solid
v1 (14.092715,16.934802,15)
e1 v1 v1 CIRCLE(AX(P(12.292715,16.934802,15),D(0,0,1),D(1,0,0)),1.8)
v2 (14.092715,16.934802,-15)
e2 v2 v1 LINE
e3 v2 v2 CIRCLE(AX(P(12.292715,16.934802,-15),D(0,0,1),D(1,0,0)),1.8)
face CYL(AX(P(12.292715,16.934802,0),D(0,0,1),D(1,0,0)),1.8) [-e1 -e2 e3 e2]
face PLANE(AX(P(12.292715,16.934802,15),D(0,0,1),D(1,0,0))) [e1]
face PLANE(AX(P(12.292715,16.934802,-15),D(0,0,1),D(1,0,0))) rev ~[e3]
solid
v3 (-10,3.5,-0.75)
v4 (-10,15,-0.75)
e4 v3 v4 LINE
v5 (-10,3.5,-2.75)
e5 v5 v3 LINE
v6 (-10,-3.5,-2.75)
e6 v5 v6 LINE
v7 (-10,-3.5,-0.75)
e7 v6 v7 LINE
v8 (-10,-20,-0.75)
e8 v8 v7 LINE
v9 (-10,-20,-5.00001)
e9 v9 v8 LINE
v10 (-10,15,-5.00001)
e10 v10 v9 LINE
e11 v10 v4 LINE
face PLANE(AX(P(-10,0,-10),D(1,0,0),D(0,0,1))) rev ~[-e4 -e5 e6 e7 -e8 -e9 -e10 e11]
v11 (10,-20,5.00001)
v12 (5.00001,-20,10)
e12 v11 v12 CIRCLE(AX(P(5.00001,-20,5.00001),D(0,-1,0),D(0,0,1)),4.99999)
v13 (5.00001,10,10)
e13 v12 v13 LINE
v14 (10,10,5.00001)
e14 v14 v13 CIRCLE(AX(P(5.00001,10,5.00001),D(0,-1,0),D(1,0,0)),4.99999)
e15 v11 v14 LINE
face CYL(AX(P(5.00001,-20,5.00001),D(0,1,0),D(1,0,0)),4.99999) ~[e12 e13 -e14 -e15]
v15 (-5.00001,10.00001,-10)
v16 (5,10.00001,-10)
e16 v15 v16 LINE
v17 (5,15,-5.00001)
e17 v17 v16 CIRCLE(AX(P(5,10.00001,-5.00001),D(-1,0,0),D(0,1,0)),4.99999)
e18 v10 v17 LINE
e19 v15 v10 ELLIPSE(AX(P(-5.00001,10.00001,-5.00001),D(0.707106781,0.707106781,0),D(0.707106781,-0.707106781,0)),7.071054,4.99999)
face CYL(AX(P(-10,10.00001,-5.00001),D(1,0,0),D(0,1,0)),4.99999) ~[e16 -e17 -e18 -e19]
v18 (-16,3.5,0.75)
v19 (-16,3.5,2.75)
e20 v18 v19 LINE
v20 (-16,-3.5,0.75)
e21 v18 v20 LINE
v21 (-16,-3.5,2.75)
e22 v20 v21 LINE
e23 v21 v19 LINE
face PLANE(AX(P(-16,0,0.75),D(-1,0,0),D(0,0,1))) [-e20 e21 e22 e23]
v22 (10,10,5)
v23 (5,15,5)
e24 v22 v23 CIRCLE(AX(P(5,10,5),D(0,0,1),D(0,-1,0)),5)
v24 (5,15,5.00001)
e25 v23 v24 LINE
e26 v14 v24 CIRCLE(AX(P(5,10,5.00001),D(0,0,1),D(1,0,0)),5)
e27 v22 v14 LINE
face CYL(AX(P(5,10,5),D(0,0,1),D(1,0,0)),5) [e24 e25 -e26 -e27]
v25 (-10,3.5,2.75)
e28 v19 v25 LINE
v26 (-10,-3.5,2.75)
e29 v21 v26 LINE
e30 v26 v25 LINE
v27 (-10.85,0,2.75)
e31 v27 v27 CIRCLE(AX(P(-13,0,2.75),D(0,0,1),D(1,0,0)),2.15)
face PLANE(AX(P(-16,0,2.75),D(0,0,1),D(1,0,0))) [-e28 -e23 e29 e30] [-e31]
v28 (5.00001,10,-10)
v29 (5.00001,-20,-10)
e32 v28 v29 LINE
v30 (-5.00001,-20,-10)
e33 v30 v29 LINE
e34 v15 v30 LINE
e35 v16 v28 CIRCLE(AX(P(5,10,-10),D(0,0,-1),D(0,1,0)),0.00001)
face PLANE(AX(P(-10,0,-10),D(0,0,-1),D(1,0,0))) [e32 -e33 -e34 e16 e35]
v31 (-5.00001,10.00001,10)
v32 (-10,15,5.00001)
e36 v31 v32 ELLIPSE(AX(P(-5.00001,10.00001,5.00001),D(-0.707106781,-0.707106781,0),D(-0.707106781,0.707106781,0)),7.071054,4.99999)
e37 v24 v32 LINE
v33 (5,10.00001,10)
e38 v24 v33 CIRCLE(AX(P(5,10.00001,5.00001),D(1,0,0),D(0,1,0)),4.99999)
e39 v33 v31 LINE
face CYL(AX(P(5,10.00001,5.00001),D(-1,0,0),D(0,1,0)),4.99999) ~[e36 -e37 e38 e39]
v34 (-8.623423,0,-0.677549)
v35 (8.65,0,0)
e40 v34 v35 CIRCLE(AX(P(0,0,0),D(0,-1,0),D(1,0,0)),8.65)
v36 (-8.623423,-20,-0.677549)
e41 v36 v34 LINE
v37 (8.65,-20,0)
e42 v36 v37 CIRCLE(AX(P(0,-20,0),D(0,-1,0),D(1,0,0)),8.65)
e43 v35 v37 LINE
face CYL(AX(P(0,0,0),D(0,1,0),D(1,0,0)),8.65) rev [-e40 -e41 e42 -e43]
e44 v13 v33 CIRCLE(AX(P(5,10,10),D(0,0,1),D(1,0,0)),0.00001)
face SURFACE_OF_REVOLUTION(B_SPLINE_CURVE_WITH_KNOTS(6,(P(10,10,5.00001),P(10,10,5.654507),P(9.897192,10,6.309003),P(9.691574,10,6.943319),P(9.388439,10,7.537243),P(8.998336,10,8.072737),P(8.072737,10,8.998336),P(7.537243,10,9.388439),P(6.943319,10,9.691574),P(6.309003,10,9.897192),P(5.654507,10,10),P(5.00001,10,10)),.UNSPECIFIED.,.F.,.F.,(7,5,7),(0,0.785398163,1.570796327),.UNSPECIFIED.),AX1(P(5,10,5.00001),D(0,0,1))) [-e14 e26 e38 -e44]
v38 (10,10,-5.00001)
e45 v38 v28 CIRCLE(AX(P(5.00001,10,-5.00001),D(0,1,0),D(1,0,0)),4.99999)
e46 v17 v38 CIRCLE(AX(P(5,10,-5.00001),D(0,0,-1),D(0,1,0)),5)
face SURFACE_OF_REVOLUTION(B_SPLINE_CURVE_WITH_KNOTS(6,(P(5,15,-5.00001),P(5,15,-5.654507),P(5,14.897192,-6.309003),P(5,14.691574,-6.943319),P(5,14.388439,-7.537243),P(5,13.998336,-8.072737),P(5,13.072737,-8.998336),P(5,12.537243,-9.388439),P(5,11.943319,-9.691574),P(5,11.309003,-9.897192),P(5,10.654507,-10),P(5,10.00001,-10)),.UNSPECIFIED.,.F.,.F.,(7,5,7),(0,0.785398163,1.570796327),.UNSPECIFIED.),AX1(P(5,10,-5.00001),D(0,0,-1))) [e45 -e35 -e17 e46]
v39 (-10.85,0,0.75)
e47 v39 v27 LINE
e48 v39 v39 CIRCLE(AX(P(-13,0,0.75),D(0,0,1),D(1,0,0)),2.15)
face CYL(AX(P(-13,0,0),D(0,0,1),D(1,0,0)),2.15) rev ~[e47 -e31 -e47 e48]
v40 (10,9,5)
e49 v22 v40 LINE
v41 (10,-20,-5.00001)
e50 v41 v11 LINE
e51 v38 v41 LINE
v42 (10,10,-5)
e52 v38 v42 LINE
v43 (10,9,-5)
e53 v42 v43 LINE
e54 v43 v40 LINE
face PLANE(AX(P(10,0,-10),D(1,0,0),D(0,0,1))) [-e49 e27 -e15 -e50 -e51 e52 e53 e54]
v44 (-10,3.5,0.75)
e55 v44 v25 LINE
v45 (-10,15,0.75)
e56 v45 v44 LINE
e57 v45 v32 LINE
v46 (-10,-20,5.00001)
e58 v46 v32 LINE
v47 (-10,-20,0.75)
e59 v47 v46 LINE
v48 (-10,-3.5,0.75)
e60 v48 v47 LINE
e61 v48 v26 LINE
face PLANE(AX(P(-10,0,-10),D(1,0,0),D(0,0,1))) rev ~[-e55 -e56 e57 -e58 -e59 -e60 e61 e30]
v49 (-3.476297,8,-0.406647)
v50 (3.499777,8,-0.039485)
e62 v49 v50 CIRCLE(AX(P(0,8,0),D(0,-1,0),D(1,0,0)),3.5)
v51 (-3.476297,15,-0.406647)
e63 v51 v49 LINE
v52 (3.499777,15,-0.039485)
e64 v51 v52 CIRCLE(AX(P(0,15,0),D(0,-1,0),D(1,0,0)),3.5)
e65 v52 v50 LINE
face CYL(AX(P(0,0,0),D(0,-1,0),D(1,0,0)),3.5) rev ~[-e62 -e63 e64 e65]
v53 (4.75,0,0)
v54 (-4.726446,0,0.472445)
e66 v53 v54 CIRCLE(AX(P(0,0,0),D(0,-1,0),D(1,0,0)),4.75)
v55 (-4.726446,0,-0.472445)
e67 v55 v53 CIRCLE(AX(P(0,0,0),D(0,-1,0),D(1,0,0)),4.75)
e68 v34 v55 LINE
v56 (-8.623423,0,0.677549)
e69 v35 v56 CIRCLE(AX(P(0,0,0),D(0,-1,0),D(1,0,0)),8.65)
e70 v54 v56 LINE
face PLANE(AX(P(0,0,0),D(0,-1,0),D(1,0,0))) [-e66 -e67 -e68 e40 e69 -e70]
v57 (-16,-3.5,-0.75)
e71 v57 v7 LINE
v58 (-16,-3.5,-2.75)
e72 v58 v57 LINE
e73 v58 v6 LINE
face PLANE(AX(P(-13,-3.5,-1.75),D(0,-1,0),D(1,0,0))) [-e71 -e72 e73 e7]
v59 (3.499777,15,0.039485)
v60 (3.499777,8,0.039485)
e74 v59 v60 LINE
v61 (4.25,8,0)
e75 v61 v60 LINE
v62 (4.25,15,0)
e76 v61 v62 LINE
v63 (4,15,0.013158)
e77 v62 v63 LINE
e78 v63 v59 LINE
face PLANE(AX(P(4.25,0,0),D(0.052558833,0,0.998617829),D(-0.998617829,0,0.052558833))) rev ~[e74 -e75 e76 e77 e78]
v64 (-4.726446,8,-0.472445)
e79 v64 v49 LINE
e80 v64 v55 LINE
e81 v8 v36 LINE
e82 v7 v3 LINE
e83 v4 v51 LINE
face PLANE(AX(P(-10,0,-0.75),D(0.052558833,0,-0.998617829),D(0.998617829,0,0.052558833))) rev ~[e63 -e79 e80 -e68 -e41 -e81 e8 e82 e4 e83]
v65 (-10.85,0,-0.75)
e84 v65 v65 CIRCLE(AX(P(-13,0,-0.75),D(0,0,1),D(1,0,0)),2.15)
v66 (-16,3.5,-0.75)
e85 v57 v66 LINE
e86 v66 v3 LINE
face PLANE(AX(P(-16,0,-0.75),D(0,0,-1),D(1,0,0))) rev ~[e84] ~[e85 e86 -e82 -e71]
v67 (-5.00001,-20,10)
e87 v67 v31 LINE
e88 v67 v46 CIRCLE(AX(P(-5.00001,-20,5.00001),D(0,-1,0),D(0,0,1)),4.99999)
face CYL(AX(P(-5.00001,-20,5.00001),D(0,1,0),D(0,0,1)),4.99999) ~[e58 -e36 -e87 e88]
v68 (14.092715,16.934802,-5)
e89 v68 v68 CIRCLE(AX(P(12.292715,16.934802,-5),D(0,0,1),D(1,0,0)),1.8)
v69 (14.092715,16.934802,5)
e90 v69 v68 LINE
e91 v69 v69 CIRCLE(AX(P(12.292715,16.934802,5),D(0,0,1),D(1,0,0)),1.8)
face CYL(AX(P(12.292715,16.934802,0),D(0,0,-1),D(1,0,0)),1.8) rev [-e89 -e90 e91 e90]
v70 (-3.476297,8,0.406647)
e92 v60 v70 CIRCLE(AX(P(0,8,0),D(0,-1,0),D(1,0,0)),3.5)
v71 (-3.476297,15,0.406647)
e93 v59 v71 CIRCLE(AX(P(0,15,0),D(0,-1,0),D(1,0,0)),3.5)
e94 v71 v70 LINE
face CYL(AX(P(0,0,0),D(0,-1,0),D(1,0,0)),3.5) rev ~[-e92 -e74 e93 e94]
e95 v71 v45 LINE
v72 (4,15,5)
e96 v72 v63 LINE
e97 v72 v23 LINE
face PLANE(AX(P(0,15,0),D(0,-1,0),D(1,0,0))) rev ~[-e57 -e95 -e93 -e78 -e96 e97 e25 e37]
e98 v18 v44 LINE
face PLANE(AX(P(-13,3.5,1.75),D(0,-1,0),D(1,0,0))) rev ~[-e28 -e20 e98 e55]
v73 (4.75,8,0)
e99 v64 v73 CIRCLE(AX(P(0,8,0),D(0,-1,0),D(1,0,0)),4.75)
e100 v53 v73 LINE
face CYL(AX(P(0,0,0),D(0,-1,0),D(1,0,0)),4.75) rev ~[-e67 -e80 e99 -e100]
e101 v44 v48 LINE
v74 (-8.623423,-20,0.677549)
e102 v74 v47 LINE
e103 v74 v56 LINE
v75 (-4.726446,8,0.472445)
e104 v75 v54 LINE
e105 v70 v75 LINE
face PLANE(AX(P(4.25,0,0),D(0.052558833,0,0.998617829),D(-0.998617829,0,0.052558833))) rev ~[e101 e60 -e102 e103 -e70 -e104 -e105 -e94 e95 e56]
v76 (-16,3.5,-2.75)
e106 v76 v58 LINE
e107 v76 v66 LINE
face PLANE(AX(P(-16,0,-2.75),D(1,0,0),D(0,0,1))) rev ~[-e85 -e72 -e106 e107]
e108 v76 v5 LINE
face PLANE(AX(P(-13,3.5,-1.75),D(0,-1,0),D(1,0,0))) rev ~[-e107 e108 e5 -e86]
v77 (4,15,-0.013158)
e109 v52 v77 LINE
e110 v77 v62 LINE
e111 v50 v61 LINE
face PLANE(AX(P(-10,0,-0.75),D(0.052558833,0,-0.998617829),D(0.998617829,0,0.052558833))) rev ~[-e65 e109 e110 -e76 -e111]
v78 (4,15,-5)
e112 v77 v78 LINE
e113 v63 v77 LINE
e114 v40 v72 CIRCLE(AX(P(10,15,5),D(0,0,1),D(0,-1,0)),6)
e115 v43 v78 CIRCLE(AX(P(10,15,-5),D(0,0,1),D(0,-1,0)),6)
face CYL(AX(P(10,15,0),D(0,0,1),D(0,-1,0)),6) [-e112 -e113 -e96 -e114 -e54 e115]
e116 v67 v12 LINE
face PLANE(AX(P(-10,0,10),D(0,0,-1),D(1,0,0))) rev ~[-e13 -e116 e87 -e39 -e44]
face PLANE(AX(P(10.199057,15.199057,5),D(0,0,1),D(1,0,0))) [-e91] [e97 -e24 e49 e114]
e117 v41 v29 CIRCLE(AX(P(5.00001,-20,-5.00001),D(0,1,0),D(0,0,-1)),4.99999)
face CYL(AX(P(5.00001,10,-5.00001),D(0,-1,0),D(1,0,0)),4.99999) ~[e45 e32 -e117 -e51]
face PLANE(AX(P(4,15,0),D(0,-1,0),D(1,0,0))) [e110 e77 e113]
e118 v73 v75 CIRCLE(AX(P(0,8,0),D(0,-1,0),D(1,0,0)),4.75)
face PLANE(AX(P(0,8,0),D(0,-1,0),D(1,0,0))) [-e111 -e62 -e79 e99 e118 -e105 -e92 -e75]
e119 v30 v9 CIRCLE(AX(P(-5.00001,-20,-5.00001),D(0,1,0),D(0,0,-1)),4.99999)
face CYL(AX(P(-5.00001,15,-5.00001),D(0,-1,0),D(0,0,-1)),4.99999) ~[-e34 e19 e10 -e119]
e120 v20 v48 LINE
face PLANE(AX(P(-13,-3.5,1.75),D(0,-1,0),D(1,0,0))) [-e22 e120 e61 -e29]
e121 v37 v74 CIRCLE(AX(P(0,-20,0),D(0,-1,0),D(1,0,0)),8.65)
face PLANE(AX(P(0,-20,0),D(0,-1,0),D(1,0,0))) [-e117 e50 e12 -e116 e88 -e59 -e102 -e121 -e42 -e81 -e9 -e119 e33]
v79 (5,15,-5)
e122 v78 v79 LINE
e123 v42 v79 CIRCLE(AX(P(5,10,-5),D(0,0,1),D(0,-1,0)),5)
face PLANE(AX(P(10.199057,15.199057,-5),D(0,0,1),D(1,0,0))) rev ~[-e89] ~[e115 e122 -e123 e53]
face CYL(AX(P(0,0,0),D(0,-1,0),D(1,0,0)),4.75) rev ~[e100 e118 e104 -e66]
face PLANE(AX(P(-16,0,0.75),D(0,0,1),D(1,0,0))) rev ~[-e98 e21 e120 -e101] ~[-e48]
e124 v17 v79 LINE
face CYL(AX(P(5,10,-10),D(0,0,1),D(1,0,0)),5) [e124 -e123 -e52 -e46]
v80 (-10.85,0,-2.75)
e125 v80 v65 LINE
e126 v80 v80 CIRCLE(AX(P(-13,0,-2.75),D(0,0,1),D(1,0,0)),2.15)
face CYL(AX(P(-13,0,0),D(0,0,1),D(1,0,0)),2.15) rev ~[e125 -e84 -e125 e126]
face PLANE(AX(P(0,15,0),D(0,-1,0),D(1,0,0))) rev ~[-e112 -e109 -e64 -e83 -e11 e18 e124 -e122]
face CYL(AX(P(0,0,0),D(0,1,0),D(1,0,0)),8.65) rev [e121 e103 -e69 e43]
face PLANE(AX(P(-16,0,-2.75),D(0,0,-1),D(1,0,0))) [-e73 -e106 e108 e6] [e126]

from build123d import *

# Parameters (mm, degrees)
F0_W      = 20
F0_H      = 20
F0_R      = 8.65
F1_DEPTH  = 20
F2_W      = 20
F2_H      = 20
F3_DEPTH  = 15
F4_R      = 4.75
F5_DEPTH  = 8
F6_R      = 2.075
F7_DEPTH  = 11
F9_DEPTH  = 25.3
F10_W     = 6
F10_H     = 2
F11_DEPTH = 3.5
F12_R     = 2.15
F13_DEPTH = 5.23
F14_R     = 1.65
F15_DEPTH = 6.34
F16_R     = 1.8
F17_DEPTH = 5
F18_R     = 5
F19_R     = 5
F20_R     = 4.99999
F21_R     = 3.5
F22_DEPTH = 31.8
F23_R     = 1.8
F24_DEPTH = 15


# Not quite as in the source:
# - a fillet or chamfer is up to 0.001 mm smaller than in the source, because OpenCascade refuses the exact size


with BuildPart() as f1:
    # F0 (on Front) → F1 (new body)
    with BuildSketch(Plane.XZ):
        Rectangle(F0_W, F0_H)
        Circle(F0_R, mode=Mode.SUBTRACT)
    extrude(amount=F1_DEPTH)

    # F2 (on Front) → F3 (join)
    with BuildSketch(Plane.XZ):
        Rectangle(F2_W, F2_H)
    extrude(amount=-F3_DEPTH)

    # F4 (on Front) → F5 (cut)
    with BuildSketch(Plane.XZ):
        Circle(F4_R)
    extrude(amount=-F5_DEPTH, mode=Mode.SUBTRACT)

    # F6 (on Front) → F7 (cut)
    with BuildSketch(Plane.XZ):
        Circle(F6_R)
    extrude(amount=-F7_DEPTH, mode=Mode.SUBTRACT)

    # F8 (on Front) → F9 (cut, symmetric)
    with BuildSketch(Plane.XZ):
        Polygon((4.25, 0), (-10, 0.75), (-10, -0.75), align=None)
    extrude(amount=F9_DEPTH, both=True, mode=Mode.SUBTRACT)

    # F10 (on Front) → F11 (join, symmetric)
    with BuildSketch(Plane.XZ):
        with Locations((-13, 1.75)):
            Rectangle(F10_W, F10_H)
        with Locations((-13, -1.75)):
            Rectangle(F10_W, F10_H)
    extrude(amount=F11_DEPTH, both=True)

    # F12 (on Top) → F13 (cut, symmetric)
    with BuildSketch(Plane.XY):
        with Locations((-13, 0)):
            Circle(F12_R)
    extrude(amount=F13_DEPTH, both=True, mode=Mode.SUBTRACT)

    # F14 (on Top) → F15 (cut)
    with BuildSketch(Plane.XY):
        with Locations((-13, 0)):
            Circle(F14_R)
    extrude(amount=-F15_DEPTH, mode=Mode.SUBTRACT)

    # F16 (on Top) → F17 (join, symmetric)
    with BuildSketch(Plane.XY):
        with BuildLine():
            Line((10, 15), (10, 9))
            ThreePointArc((10, 9), (14.2426406871, 19.2426406871), (4, 15))
            Line((4, 15), (10, 15))
        make_face()
        with Locations((12.2927147724, 16.93480205)):
            Circle(F16_R, mode=Mode.SUBTRACT)
    extrude(amount=F17_DEPTH, both=True)

    # F18
    f18_edges = [f1.edges().sort_by_distance(p)[0] for p in [
        (10, 15, 7.5),
    ]]
    fillet(f18_edges, radius=F18_R)

    # F19
    f19_edges = [f1.edges().sort_by_distance(p)[0] for p in [
        (10, 15, -7.5),
    ]]
    fillet(f19_edges, radius=F19_R)

    # F20 (radius 5 in the source; OpenCascade refuses exactly that, so slightly less here)
    f20_edges = [f1.edges().sort_by_distance(p)[0] for p in [
        (-10, -2.5, -10),
        (-10, -2.5, 10),
        (10, -5, -10),
        (10, -5, 10),
    ]]
    fillet(f20_edges, radius=F20_R)

    # F21 (on Front) → F22 (cut)
    with BuildSketch(Plane.XZ):
        Circle(F21_R)
    extrude(amount=-F22_DEPTH, mode=Mode.SUBTRACT)


with BuildPart() as f24:
    # F23 (on Top) → F24 (new body, symmetric)
    with BuildSketch(Plane.XY):
        with Locations((12.2927147724, 16.93480205)):
            Circle(F23_R)
    extrude(amount=F24_DEPTH, both=True)


solid = Compound([f1.part, f24.part])
